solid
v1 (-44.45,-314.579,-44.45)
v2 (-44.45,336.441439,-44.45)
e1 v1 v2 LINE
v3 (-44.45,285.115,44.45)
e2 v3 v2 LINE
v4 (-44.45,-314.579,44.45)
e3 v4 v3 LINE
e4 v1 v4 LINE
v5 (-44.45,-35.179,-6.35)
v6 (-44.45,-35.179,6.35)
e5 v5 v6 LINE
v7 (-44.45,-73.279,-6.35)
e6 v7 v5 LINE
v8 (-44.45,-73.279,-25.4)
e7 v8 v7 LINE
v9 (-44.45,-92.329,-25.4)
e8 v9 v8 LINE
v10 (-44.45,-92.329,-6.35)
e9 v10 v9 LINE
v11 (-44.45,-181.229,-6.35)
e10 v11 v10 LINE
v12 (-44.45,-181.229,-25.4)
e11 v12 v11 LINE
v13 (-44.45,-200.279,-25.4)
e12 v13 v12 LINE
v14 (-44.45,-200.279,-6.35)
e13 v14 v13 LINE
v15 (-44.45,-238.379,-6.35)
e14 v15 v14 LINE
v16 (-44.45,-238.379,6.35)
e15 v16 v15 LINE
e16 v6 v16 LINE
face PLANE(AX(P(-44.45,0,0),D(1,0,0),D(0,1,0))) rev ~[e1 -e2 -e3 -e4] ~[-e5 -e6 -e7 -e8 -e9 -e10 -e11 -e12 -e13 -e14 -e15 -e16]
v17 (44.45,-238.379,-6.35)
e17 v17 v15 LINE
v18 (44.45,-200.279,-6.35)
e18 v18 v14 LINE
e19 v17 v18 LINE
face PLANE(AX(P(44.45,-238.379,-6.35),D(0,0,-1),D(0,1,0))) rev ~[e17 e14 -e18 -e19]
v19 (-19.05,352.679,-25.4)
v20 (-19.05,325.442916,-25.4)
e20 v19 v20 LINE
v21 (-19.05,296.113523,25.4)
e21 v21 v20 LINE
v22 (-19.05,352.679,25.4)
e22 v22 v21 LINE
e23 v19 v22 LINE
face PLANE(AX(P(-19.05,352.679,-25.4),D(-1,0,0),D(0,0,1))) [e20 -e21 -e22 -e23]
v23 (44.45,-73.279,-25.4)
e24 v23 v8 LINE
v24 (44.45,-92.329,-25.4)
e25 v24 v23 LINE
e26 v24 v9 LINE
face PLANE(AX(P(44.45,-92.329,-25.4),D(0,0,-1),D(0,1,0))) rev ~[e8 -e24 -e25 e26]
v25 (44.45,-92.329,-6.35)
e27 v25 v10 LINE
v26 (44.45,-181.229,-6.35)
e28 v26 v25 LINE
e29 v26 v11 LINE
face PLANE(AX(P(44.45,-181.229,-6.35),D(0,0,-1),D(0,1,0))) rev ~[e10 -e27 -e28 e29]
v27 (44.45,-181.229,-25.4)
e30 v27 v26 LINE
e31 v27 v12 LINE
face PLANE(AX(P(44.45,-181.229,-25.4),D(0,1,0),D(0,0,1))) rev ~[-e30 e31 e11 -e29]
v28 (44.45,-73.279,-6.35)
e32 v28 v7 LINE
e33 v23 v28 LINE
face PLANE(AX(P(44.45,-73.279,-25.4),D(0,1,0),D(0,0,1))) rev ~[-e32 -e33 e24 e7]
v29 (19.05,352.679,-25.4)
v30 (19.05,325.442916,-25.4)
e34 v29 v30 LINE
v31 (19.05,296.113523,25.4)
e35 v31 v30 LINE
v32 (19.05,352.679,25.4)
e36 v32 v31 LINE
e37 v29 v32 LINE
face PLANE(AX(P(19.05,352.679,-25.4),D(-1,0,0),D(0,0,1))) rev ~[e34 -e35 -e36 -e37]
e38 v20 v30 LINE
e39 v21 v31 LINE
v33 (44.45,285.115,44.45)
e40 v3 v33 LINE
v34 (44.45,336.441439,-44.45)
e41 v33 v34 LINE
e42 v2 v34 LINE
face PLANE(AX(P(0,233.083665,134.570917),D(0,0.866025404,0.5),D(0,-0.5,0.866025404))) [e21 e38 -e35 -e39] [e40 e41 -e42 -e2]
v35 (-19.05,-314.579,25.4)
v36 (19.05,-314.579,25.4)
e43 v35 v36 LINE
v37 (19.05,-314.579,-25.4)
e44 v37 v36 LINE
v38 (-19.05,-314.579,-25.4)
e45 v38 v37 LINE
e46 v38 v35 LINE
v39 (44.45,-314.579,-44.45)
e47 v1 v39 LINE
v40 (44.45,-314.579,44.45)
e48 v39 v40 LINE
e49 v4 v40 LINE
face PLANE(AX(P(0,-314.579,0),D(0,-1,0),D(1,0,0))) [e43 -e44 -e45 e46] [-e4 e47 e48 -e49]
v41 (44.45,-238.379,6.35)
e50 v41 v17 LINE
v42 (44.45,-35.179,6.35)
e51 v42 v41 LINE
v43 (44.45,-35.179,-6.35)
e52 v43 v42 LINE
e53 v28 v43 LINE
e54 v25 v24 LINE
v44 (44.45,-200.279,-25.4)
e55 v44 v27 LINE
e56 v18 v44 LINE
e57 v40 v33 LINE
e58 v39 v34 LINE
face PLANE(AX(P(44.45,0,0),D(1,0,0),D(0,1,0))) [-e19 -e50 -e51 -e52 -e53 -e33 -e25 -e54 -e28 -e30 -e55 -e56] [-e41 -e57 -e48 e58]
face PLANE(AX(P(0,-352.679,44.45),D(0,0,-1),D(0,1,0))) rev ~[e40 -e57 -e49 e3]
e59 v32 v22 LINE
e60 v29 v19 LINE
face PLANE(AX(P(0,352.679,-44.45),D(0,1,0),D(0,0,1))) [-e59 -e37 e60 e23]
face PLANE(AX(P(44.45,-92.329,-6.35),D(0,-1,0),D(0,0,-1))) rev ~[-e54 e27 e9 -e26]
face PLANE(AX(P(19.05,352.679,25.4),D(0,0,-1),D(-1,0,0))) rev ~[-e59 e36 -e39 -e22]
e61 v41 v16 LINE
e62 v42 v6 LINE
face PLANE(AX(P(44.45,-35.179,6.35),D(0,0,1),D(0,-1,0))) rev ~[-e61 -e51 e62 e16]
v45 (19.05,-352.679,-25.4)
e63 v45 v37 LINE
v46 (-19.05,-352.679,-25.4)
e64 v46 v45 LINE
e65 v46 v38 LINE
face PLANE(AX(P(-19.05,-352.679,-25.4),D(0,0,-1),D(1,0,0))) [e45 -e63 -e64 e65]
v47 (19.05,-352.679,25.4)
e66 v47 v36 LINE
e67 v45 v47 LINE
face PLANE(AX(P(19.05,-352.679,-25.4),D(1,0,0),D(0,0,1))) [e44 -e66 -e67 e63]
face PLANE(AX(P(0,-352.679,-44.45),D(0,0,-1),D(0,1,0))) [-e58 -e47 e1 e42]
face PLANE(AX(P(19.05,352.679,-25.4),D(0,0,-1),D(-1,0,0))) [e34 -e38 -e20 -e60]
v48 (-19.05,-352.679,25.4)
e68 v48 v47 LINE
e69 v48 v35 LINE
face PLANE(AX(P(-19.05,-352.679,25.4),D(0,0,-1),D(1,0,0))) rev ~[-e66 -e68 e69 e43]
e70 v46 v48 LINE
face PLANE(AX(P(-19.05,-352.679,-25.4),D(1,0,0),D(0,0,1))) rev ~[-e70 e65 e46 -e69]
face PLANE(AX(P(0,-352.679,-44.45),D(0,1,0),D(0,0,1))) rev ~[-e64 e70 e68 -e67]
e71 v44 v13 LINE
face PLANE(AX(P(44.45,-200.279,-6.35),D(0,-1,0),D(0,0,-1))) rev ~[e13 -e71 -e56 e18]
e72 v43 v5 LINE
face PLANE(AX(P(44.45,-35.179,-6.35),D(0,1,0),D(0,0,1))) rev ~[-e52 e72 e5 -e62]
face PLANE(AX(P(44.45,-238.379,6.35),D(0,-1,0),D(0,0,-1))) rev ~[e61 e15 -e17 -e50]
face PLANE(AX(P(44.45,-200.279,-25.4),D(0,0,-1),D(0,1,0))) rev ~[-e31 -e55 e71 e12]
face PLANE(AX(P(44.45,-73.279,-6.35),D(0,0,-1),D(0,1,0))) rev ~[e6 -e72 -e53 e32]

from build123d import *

# Parameters (mm, degrees)
F0_W     = 705.358
F0_H     = 88.9
F1_DEPTH = 44.45
F4_W     = 88.9
F4_H     = 88.9
F4_W_2   = 38.1
F4_H_2   = 50.8
F5_REACH = 193.287585695
F6_W     = 88.9
F6_H     = 88.9
F6_W_2   = 38.1
F6_H_2   = 50.8
F7_DEPTH = 38.1
F9_DEPTH = 88.901


with BuildPart() as f1:
    # F0 (on Right) → F1 (new body, symmetric)
    with BuildSketch(Plane.YZ):
        Rectangle(F0_W, F0_H)
    extrude(amount=F1_DEPTH, both=True)

    f5_end = Plane(origin=(0, 233.0836645991, 134.5709165), x_dir=(0, -0.5, 0.8660254038), z_dir=(0, 0.8660254038, 0.5))
    # F4 (on face) → F5 (cut, up to a plane its end follows)
    with BuildSketch(Plane(origin=(0, 352.679, 0), x_dir=(-1, 0, 0), z_dir=(0, 1, 0))):
        Rectangle(F4_W, F4_H)
        Rectangle(F4_W_2, F4_H_2, mode=Mode.SUBTRACT)
    f5_long = extrude(amount=-F5_REACH, mode=Mode.PRIVATE)
    add(split(f5_long, bisect_by=f5_end, keep=Keep.TOP, mode=Mode.PRIVATE), mode=Mode.SUBTRACT)

    # F6 (on face) → F7 (cut)
    with BuildSketch(Plane.XZ.offset(352.679)):
        Rectangle(F6_W, F6_H)
        Rectangle(F6_W_2, F6_H_2, mode=Mode.SUBTRACT)
    extrude(amount=-F7_DEPTH, mode=Mode.SUBTRACT)

    # F8 (on face) → F9 (cut, through all)
    with BuildSketch(Plane.YZ.offset(44.45)):
        Polygon((-35.179, -6.35), (-35.179, 6.35), (-238.379, 6.35), (-238.379, -6.35), (-200.279, -6.35), (-200.279, -25.4), (-181.229, -25.4), (-181.229, -6.35), (-92.329, -6.35), (-92.329, -25.4), (-73.279, -25.4), (-73.279, -6.35), align=None)
    extrude(amount=-F9_DEPTH, mode=Mode.SUBTRACT)


solid = f1.part
